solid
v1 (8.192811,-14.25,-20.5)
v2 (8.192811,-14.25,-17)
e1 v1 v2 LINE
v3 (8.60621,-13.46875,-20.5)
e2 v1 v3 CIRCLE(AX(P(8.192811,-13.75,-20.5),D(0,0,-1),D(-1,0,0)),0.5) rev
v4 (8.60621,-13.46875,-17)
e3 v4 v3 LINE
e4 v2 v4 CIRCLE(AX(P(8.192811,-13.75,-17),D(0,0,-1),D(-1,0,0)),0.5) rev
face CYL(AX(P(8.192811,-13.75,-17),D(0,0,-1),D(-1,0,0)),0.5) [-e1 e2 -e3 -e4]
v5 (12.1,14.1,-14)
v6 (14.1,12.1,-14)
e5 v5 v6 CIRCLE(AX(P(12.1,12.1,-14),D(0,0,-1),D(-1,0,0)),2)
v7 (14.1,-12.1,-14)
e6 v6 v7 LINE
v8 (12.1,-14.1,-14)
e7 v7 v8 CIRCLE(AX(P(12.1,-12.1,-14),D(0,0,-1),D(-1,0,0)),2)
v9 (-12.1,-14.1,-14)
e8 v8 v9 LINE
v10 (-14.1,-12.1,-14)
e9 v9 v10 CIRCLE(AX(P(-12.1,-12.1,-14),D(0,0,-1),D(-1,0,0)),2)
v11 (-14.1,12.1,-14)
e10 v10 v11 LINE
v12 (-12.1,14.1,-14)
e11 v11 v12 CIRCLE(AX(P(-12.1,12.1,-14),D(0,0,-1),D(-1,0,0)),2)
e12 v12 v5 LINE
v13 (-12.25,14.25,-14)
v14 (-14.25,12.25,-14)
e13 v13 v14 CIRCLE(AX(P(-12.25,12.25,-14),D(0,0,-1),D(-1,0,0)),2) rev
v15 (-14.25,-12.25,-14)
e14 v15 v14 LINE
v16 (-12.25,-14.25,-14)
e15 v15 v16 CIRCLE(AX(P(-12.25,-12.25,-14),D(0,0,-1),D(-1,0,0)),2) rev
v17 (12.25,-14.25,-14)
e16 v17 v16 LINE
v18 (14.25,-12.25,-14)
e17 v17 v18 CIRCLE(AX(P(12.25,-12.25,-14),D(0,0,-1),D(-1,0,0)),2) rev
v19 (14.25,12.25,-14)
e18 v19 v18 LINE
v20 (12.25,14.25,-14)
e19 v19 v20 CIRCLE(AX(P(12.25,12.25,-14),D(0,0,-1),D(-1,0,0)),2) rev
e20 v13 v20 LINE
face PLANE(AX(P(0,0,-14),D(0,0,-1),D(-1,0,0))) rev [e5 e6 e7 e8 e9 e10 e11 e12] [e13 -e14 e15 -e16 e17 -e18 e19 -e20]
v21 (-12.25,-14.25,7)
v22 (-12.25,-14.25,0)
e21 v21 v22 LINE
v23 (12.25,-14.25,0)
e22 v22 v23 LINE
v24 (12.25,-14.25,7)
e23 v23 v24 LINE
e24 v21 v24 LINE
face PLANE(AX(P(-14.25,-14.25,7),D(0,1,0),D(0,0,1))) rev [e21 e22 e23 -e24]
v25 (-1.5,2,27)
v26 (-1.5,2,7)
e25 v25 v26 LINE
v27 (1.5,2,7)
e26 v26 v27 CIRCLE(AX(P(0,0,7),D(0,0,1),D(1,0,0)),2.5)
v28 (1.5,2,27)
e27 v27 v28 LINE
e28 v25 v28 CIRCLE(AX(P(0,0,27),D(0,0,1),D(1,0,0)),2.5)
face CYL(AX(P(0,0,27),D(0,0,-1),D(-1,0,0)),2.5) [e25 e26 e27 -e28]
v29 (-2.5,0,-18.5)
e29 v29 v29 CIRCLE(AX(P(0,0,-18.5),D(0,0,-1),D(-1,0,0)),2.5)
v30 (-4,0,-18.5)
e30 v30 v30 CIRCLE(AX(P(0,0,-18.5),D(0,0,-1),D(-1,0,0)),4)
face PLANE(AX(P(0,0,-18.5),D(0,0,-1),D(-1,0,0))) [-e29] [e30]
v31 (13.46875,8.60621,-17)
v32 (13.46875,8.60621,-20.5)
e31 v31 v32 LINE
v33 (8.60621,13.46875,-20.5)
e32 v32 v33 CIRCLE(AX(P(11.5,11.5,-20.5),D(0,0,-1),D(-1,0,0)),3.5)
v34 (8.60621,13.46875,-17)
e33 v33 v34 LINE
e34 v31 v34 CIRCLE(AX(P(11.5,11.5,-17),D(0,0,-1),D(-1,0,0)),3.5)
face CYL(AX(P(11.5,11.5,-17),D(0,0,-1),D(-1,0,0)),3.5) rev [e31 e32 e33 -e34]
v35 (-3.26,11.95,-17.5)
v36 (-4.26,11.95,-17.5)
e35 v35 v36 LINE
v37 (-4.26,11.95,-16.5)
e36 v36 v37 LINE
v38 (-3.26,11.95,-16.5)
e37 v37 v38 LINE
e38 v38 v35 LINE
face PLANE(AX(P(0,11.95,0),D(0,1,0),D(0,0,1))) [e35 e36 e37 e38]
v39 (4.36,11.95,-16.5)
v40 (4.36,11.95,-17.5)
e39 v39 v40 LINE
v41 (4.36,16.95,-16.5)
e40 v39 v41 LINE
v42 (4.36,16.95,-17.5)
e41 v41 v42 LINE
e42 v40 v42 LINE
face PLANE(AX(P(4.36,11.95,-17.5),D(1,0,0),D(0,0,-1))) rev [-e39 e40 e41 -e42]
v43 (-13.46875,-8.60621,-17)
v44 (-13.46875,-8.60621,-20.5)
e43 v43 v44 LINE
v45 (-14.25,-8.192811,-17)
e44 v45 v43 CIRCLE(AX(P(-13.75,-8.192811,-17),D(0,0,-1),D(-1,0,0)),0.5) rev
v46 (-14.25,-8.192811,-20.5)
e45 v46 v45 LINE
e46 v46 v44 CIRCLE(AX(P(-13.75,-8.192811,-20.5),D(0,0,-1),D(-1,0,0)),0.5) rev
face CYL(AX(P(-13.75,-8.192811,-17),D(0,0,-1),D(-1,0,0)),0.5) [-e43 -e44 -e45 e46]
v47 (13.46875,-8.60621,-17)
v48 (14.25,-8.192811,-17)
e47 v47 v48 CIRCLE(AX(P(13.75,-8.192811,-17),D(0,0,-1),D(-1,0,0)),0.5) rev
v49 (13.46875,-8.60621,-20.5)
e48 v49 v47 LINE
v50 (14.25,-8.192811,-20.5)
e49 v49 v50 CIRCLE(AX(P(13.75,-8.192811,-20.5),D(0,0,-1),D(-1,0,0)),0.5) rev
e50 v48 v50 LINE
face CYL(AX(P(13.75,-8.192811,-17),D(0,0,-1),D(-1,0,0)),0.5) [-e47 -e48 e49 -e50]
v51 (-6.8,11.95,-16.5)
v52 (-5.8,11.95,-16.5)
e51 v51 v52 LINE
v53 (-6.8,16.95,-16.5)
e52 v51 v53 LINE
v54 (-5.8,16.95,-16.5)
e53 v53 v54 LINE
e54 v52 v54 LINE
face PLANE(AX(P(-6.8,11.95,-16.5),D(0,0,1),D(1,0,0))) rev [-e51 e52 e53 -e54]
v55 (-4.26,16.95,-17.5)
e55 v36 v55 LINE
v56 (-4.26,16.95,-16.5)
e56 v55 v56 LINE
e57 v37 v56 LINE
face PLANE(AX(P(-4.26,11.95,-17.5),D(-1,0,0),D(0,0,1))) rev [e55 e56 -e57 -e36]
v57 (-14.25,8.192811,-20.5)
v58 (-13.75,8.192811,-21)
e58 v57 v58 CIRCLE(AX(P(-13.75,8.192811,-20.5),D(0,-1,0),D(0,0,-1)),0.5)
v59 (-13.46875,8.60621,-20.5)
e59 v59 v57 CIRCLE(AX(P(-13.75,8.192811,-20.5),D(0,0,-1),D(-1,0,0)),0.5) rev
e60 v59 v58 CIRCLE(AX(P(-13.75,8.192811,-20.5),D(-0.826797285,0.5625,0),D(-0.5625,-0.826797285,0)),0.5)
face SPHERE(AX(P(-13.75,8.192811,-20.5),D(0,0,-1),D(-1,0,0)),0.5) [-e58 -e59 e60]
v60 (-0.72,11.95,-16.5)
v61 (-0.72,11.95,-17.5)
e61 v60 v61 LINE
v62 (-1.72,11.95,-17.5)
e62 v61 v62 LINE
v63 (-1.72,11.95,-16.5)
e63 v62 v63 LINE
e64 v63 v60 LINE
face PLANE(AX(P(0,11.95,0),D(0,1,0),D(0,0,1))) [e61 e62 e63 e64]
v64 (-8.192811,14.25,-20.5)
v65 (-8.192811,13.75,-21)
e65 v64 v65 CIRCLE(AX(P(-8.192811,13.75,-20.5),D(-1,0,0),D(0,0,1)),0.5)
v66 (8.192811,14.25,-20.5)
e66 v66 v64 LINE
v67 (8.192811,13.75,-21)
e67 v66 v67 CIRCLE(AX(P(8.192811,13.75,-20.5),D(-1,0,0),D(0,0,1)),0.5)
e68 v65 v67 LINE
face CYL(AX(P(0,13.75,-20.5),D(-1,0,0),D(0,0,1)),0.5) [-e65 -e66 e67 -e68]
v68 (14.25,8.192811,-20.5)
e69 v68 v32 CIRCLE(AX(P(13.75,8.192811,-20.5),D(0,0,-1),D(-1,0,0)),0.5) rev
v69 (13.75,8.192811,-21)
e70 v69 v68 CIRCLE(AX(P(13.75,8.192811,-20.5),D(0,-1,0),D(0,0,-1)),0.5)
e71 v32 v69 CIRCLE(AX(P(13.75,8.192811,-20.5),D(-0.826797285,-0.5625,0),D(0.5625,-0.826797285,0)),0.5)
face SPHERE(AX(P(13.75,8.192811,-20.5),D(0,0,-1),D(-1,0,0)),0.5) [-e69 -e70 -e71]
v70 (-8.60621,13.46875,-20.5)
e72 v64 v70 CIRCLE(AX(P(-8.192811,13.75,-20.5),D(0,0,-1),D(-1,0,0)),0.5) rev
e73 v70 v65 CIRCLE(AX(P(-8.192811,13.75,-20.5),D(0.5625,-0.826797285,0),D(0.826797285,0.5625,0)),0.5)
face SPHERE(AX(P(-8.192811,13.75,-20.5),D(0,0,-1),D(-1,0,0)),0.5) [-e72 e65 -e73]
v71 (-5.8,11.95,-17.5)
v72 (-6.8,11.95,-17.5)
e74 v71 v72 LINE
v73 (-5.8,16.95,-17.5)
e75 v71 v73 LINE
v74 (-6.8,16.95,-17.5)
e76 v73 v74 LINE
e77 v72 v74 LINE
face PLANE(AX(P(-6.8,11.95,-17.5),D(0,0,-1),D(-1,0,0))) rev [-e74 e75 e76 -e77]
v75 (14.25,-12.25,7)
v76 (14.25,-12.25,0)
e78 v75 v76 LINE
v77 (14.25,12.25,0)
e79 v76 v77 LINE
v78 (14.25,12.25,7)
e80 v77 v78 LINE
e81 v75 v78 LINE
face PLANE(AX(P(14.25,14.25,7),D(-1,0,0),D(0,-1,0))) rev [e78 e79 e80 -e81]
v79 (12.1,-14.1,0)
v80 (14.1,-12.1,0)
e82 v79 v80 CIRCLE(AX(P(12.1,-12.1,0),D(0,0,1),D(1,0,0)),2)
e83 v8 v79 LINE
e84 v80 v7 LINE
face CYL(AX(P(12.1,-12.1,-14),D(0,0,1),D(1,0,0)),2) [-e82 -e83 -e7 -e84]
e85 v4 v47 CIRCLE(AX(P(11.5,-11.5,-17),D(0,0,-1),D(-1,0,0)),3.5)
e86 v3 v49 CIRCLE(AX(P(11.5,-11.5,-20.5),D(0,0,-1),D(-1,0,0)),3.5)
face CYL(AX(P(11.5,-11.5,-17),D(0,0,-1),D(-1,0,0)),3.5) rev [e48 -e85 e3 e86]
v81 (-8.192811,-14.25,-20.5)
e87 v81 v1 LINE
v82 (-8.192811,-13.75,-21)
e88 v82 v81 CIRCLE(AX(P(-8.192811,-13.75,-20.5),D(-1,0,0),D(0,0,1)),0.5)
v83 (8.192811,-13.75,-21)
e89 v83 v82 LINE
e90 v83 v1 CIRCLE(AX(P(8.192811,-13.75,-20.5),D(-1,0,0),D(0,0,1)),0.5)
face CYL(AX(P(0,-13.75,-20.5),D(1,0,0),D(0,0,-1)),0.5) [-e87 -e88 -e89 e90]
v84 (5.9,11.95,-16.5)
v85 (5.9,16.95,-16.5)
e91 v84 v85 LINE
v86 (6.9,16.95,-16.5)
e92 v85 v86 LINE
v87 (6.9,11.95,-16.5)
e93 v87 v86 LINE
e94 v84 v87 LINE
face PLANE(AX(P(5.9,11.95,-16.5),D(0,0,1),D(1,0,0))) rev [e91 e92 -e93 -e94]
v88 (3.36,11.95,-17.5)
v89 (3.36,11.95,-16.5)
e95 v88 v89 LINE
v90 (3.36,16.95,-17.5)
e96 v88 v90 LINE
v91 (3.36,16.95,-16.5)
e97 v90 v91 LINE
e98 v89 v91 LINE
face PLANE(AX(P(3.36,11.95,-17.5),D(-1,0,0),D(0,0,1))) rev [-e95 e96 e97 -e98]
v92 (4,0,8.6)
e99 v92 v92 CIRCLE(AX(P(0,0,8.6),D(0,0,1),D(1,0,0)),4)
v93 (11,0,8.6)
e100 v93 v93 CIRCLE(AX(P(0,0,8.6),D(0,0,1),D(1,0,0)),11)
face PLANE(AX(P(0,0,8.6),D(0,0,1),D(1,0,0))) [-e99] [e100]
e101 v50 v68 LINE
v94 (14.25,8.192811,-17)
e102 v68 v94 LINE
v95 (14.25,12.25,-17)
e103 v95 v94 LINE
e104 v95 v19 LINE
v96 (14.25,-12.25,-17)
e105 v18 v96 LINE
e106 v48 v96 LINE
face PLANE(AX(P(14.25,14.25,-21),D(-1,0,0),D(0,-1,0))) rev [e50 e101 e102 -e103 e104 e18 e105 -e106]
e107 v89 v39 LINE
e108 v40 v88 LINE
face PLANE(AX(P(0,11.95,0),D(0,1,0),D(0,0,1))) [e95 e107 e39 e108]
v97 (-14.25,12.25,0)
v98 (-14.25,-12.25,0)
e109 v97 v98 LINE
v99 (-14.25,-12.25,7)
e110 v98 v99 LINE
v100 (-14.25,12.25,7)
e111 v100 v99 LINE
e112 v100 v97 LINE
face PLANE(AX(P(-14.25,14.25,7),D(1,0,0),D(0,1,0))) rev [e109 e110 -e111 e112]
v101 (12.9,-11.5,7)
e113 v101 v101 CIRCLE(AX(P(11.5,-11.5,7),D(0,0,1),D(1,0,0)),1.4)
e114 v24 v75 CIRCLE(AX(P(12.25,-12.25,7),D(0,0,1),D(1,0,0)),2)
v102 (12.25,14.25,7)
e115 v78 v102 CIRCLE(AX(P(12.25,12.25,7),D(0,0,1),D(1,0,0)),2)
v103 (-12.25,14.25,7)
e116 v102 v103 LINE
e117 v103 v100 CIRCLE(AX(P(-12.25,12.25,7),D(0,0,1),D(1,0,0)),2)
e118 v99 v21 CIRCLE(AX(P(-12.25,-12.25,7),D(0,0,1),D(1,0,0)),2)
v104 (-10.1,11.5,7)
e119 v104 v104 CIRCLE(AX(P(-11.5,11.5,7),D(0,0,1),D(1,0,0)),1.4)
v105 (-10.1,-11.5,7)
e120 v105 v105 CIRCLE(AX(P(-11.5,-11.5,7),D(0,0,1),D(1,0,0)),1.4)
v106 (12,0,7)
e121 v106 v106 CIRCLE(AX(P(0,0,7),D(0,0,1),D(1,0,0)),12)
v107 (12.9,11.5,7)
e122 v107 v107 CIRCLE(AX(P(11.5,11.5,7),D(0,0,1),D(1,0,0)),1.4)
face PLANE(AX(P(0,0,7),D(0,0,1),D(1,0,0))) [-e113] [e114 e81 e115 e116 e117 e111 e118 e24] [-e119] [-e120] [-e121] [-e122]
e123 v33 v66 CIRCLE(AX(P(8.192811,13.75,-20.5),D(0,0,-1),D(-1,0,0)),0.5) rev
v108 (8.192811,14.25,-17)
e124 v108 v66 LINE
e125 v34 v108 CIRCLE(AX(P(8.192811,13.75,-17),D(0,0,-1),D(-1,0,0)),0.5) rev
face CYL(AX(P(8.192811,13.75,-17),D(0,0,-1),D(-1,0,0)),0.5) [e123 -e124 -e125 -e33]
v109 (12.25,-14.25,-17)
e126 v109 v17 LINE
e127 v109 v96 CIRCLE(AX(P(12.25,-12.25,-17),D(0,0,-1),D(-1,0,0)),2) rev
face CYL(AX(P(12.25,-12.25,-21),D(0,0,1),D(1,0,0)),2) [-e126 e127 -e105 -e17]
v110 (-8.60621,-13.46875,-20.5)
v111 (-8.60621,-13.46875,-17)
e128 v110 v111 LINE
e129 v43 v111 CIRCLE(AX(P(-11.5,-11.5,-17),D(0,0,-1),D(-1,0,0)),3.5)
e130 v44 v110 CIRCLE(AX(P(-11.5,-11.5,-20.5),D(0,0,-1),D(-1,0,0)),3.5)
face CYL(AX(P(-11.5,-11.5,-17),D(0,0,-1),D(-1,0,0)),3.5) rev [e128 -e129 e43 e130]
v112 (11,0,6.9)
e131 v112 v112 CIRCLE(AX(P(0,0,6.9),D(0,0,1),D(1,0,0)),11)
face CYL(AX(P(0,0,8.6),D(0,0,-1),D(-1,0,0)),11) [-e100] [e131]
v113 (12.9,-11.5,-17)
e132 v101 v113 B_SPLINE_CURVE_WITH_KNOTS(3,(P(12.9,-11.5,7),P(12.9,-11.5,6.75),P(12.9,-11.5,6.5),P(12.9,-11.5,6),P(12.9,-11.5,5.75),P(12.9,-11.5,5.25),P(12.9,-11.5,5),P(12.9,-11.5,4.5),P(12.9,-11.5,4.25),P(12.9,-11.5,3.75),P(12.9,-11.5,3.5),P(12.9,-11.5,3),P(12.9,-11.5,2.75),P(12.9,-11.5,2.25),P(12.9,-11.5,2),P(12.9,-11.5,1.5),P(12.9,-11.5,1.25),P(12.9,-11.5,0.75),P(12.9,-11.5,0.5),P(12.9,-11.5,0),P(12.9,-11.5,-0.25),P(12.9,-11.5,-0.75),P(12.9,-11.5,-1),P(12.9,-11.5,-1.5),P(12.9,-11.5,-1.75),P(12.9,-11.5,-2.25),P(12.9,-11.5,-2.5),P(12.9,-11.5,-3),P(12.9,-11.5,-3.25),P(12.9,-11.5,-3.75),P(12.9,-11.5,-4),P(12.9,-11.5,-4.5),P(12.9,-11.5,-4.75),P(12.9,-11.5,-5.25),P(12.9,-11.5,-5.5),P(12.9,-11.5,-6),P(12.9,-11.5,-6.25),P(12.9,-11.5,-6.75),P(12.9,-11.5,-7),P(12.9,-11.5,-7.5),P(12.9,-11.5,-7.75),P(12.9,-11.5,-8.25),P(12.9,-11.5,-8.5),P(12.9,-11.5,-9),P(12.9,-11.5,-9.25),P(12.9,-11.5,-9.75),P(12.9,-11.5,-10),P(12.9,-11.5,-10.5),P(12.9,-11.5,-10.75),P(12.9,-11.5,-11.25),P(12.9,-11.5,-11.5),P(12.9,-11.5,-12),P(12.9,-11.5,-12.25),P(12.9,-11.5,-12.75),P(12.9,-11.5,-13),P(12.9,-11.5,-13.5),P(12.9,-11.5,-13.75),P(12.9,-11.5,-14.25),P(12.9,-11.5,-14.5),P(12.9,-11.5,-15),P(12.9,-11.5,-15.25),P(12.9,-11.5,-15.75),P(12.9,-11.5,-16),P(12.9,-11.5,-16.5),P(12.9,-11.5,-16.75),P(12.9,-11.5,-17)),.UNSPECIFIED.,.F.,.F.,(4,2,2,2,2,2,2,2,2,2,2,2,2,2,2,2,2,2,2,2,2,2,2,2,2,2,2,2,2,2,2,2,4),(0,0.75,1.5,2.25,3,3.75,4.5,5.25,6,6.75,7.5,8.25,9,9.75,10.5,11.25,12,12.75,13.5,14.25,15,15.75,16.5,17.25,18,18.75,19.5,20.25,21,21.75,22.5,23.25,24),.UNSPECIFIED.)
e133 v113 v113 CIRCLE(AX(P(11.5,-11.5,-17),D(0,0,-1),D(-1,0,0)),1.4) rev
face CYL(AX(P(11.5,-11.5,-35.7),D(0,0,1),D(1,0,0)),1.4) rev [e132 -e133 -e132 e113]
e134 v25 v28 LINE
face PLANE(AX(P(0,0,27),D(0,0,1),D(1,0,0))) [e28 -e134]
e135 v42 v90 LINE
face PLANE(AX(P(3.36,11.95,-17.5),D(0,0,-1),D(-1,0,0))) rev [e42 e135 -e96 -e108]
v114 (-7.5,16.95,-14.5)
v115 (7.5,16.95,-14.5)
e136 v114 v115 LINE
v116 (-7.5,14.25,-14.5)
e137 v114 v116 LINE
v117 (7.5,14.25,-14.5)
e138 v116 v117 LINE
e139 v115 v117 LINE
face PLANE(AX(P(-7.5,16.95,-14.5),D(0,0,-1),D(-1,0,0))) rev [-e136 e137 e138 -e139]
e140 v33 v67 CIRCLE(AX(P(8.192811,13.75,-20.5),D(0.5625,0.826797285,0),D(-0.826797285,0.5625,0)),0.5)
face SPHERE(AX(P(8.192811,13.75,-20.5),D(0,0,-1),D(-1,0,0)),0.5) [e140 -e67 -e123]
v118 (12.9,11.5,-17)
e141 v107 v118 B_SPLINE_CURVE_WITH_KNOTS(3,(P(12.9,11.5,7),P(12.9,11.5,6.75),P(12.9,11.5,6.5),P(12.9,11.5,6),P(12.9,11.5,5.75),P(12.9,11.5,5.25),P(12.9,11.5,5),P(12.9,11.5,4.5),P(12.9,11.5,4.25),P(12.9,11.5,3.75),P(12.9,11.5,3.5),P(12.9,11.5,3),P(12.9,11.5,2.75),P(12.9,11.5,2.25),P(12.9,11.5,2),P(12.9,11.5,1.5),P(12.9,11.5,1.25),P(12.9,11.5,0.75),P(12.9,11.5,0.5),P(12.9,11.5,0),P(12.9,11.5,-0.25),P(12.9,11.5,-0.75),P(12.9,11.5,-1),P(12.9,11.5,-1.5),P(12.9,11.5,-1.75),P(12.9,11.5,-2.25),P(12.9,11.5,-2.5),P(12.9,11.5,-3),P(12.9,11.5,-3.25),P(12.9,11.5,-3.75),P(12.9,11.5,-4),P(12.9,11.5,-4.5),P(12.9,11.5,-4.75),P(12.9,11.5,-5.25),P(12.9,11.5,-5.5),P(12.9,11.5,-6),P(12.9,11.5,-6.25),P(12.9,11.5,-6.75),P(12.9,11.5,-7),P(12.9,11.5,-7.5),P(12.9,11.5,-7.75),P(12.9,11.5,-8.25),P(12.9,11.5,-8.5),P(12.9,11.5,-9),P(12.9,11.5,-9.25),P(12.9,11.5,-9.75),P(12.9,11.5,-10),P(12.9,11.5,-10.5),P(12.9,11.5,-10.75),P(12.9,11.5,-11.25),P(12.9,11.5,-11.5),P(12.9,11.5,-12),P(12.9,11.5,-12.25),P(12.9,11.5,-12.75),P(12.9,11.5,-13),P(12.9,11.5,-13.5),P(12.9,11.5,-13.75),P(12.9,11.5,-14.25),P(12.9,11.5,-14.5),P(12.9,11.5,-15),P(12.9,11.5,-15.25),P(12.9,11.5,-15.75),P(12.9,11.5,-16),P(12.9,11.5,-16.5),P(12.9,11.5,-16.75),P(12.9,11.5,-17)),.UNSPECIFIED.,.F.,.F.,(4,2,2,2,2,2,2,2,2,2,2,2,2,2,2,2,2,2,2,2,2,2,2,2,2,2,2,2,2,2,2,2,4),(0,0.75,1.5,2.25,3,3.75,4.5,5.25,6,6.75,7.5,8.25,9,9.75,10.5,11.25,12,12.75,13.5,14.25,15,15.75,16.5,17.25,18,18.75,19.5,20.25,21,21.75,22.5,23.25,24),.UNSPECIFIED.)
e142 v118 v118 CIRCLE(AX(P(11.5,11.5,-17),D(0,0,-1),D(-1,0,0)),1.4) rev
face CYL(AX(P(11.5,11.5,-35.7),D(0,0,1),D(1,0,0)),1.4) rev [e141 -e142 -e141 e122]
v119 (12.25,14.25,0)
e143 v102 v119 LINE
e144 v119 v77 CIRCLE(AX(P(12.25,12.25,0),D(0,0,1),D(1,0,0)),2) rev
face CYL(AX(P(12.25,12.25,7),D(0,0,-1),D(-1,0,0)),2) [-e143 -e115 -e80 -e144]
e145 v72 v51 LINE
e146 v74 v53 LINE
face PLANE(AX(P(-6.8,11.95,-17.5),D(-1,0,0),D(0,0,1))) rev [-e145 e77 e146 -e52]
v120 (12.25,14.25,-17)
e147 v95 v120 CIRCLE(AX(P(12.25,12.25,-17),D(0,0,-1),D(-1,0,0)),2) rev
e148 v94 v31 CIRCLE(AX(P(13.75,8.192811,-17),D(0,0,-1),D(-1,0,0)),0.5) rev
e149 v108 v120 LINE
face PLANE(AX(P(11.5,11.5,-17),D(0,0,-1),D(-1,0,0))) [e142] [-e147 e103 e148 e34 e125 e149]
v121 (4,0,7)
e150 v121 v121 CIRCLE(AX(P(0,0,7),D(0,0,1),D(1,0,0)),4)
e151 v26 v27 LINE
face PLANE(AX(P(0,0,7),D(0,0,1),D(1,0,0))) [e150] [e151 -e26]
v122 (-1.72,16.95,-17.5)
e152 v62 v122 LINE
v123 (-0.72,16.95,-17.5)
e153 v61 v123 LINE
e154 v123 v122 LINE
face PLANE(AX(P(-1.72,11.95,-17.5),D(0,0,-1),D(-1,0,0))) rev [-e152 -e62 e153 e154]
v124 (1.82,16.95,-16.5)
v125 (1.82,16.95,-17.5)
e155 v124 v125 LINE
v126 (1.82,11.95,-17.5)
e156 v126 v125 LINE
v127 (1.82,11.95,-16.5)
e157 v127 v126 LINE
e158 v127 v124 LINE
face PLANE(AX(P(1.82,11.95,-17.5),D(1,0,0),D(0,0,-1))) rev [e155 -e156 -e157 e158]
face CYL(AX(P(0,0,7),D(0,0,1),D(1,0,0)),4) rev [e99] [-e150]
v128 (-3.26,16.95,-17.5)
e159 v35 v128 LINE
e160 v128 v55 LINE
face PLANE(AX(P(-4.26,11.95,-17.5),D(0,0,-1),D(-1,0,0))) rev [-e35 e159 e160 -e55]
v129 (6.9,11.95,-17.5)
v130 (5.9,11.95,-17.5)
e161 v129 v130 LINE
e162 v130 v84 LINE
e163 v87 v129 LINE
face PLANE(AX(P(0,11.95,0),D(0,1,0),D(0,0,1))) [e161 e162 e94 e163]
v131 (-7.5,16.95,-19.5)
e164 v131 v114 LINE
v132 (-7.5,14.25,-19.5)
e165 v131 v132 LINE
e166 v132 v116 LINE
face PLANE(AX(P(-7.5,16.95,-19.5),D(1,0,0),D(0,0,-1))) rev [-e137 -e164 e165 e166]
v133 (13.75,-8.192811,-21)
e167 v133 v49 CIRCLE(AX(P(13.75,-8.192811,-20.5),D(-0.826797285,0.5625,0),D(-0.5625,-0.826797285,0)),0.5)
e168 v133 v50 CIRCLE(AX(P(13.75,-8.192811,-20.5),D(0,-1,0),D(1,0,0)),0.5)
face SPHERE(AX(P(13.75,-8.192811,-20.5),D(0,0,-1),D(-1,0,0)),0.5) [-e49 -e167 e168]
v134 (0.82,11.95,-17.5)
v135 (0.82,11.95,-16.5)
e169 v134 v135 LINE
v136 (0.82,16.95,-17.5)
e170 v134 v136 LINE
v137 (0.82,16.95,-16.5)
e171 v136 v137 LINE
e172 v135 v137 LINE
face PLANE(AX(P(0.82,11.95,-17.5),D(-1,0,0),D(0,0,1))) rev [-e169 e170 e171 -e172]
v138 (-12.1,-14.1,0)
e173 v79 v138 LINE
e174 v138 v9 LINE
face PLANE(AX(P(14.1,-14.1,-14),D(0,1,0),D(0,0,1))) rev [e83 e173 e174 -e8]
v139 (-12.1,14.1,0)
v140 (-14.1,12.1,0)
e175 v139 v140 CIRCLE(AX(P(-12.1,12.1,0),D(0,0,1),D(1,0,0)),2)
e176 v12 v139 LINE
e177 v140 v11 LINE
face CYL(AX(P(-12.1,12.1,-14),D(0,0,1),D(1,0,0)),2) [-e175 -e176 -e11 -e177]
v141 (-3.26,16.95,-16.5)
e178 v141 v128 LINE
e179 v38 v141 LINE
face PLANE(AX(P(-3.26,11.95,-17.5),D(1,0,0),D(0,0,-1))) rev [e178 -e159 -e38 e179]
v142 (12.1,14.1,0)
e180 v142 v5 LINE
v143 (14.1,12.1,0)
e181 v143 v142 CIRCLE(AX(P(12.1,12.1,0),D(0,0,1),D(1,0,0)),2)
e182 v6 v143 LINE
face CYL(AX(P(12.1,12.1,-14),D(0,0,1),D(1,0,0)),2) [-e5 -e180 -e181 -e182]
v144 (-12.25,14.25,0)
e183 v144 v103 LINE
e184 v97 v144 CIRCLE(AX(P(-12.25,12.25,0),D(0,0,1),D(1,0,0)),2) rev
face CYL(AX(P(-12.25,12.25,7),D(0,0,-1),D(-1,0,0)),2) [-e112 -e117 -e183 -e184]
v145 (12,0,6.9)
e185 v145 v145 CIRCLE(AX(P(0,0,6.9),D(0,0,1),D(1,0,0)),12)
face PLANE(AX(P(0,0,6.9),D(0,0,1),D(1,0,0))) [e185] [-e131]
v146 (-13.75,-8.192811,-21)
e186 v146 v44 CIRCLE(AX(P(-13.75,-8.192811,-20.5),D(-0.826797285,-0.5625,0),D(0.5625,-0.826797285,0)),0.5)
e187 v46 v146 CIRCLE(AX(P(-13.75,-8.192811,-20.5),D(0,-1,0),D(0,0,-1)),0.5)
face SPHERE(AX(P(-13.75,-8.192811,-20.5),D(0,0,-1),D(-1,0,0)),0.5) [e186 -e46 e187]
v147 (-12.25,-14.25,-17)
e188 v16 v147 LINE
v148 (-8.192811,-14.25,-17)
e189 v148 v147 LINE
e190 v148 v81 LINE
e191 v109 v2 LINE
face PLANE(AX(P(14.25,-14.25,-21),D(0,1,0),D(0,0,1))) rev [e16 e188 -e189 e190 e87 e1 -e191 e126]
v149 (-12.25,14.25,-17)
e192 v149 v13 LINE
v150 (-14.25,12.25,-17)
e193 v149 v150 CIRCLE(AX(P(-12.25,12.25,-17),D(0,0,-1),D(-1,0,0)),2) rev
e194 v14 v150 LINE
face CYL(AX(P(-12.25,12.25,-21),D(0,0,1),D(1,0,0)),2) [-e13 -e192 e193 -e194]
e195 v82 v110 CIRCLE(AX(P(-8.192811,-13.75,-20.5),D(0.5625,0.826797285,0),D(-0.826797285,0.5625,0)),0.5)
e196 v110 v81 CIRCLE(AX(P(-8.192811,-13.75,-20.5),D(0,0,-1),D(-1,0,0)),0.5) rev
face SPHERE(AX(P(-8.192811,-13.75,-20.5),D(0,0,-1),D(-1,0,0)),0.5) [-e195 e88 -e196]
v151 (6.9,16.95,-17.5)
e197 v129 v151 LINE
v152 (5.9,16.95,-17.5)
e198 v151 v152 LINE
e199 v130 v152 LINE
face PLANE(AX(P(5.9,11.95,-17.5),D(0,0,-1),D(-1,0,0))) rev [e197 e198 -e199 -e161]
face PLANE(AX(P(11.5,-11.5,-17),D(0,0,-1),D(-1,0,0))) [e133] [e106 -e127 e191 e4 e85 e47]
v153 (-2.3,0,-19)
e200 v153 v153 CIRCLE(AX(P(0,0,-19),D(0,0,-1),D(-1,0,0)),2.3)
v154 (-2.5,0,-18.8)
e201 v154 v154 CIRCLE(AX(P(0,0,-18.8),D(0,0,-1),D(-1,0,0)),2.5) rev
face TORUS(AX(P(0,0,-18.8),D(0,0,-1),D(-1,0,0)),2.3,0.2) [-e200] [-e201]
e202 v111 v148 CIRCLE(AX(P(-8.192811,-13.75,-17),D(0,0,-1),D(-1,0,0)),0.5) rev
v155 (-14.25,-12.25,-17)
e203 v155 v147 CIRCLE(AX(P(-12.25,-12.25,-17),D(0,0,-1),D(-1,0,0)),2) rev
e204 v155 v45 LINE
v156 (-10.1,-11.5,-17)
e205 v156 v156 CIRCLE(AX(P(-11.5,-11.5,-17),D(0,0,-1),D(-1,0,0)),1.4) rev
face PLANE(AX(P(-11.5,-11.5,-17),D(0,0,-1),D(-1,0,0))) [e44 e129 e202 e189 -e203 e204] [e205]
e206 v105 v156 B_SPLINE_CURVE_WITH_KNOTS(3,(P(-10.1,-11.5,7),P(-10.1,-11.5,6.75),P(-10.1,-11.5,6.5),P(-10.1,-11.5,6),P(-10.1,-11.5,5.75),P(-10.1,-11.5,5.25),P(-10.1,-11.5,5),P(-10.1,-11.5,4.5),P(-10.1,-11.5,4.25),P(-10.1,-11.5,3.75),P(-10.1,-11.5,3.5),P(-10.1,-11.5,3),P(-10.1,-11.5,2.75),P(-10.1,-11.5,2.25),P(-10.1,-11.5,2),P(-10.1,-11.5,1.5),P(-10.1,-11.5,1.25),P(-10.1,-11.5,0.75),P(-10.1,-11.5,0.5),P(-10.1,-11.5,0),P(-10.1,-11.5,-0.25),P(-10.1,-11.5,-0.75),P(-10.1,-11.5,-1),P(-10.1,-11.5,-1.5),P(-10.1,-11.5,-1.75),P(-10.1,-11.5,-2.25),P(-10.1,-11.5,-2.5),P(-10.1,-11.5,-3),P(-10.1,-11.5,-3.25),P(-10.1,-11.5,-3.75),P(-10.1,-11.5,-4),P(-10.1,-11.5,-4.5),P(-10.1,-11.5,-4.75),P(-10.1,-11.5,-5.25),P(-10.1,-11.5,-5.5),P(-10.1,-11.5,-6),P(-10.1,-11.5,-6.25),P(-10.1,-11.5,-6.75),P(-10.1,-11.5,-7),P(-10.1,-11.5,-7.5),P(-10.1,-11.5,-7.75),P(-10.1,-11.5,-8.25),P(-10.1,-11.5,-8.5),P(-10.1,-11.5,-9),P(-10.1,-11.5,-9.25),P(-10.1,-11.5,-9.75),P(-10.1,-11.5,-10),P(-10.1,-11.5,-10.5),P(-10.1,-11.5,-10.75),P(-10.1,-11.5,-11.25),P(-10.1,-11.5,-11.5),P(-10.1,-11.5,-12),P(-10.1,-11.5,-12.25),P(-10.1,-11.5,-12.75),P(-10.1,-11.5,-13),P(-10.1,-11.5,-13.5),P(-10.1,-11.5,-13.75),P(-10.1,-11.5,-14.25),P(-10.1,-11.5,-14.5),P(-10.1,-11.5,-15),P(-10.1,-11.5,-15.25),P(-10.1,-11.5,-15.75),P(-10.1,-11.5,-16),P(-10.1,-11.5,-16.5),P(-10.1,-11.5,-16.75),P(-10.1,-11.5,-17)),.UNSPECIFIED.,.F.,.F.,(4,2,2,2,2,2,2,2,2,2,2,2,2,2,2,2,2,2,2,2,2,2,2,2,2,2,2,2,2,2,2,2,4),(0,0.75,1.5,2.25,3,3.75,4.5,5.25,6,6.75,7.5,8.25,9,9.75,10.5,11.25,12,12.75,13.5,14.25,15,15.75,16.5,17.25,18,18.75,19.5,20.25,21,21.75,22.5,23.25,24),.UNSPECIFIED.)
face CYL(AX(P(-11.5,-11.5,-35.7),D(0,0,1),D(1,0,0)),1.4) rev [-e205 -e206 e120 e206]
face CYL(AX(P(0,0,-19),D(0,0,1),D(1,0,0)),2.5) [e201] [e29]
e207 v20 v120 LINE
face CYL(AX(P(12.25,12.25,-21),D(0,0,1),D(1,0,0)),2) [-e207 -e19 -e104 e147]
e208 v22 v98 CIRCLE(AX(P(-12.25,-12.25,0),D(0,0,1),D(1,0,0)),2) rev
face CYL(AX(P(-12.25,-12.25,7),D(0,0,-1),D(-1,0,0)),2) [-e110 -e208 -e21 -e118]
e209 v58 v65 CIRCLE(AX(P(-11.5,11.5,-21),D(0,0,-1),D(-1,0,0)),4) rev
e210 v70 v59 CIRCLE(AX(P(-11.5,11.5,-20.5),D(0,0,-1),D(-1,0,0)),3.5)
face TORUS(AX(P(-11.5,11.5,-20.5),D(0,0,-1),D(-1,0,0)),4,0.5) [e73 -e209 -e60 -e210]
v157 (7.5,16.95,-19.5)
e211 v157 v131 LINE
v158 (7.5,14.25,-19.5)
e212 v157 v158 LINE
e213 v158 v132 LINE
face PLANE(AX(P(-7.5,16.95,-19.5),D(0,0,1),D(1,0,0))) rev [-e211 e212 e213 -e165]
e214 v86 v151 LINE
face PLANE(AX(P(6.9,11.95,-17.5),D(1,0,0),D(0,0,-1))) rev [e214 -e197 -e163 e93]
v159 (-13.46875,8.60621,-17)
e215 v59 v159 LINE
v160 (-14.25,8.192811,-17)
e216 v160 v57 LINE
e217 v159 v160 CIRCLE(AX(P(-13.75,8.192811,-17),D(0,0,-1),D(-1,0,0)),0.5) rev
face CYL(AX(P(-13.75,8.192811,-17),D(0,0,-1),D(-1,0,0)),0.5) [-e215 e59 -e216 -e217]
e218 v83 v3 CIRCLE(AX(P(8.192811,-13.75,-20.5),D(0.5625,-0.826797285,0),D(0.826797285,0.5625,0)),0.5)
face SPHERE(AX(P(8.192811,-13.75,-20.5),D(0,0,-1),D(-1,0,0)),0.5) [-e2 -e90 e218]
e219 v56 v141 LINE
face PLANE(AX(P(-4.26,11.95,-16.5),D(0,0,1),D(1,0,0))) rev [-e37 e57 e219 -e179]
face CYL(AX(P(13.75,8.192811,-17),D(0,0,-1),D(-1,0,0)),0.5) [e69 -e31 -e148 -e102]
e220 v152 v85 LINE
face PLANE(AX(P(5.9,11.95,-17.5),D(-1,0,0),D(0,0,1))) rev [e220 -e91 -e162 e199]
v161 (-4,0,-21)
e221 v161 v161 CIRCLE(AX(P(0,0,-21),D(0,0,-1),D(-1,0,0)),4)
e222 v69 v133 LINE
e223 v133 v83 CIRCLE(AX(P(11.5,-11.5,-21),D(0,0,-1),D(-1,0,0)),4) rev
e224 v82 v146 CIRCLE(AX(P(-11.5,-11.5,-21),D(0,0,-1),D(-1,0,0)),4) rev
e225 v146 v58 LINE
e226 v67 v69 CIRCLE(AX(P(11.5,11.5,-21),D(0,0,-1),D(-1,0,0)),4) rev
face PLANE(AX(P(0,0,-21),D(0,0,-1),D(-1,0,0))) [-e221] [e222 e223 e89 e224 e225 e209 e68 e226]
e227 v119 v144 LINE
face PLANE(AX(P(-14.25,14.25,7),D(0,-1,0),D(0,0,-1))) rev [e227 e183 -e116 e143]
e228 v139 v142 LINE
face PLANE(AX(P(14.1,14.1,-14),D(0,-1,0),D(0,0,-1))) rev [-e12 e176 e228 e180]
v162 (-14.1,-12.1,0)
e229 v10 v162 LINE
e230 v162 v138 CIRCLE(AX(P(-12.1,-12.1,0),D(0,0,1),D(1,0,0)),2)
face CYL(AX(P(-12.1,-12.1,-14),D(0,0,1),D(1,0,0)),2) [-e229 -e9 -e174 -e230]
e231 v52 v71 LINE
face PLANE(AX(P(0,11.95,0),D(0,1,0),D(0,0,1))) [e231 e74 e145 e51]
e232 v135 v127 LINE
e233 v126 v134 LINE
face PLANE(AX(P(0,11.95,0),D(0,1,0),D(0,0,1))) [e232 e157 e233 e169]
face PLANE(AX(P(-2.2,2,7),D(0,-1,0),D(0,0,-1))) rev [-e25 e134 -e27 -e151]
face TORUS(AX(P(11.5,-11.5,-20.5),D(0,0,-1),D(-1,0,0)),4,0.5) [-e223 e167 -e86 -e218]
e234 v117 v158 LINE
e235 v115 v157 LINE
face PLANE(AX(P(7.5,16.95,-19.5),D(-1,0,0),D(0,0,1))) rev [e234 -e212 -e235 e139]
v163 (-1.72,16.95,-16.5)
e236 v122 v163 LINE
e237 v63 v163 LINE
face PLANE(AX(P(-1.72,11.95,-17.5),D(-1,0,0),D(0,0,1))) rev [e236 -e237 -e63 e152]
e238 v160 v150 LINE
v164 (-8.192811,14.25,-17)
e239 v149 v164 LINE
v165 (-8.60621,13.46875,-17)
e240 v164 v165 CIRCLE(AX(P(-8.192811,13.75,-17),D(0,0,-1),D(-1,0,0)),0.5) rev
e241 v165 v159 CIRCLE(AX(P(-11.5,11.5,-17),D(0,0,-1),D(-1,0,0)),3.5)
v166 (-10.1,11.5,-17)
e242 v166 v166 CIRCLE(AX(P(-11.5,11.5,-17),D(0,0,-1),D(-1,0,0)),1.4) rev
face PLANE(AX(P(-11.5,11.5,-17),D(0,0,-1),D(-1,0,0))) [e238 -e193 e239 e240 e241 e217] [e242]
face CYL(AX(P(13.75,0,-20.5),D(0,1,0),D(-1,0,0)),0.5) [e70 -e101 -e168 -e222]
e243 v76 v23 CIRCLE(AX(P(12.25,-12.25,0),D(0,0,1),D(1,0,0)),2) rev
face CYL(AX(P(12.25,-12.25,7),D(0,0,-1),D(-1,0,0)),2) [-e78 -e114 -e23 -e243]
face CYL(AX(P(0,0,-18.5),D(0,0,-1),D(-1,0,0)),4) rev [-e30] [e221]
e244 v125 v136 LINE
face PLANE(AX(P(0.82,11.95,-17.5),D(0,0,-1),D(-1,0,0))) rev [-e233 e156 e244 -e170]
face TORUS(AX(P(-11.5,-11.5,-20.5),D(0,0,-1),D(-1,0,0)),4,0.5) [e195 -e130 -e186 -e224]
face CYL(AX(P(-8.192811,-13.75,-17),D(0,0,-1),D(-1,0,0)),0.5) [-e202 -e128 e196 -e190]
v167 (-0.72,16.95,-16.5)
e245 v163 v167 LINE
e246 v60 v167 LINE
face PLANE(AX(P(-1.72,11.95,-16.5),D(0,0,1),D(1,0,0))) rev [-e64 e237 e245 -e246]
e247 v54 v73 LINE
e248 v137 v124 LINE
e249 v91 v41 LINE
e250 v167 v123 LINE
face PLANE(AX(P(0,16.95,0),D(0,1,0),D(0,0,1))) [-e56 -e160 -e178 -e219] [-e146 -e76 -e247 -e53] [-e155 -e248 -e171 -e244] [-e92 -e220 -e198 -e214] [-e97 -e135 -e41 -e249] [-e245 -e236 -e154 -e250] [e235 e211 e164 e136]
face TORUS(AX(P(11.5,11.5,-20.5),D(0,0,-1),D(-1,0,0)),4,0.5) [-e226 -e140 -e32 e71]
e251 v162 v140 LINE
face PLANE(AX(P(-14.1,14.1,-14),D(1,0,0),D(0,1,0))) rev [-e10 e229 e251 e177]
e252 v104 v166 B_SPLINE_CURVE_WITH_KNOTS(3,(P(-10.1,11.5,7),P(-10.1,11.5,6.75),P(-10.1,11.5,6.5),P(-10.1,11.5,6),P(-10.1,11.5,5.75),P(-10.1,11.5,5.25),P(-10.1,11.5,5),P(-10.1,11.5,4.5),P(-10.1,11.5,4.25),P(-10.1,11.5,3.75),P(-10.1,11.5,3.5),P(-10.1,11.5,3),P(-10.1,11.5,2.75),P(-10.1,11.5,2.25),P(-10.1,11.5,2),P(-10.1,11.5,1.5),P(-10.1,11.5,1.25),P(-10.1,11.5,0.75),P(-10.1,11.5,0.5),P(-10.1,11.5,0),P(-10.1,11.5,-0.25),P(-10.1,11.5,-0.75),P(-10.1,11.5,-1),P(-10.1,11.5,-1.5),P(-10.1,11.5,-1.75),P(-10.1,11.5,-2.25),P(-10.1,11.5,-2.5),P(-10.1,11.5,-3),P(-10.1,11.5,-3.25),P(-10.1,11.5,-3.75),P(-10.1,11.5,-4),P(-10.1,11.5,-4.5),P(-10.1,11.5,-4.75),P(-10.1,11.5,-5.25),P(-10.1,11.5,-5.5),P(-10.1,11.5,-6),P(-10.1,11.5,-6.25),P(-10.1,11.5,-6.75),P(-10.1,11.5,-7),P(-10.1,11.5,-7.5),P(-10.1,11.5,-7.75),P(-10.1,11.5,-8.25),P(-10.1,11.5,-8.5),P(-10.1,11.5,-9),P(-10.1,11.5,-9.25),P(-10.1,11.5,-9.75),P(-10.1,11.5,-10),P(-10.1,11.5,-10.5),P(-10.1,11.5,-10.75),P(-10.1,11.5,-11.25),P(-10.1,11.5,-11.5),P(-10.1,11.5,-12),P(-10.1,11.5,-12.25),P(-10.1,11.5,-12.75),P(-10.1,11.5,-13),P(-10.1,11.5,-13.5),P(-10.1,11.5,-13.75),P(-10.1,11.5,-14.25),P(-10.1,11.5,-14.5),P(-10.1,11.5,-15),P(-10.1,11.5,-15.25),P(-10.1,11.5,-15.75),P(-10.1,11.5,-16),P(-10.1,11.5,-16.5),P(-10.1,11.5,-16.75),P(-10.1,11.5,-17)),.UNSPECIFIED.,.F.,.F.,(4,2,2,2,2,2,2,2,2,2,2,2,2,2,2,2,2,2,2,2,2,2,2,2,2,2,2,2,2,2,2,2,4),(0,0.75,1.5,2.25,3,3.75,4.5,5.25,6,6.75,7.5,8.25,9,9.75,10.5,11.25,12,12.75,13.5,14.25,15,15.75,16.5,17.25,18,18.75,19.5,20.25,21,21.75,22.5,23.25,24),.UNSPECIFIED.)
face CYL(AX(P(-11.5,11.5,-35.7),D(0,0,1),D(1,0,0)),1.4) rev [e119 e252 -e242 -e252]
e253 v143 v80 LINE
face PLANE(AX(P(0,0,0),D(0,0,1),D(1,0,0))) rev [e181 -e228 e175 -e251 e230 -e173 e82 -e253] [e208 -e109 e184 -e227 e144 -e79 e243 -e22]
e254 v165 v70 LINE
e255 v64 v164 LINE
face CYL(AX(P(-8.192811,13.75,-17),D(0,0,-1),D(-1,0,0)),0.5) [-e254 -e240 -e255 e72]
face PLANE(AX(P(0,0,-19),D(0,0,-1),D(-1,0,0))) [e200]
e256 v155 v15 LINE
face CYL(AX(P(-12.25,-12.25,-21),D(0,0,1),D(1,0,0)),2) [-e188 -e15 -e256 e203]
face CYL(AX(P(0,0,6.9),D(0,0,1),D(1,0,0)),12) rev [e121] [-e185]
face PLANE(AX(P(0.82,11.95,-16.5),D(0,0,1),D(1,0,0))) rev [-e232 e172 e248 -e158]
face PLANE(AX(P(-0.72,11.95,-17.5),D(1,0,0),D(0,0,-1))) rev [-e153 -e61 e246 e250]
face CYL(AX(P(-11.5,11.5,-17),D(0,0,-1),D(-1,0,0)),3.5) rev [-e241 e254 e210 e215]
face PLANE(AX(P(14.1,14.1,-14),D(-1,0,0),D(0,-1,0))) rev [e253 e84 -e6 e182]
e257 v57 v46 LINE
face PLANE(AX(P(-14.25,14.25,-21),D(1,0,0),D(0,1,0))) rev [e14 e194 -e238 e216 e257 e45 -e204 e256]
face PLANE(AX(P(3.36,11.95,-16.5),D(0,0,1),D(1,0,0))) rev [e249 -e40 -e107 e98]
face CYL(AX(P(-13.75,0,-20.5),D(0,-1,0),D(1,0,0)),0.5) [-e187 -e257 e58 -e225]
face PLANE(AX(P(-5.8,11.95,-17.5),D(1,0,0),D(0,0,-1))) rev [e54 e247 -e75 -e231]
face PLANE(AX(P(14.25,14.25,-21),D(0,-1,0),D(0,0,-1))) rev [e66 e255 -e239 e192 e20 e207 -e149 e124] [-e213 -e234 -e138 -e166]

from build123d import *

# Parameters (mm, degrees)
SKETCH1_W           = 28.5
SKETCH1_H           = 28.5
BOSS_EXTRUDE1_DEPTH = 7
FILLET1_R           = 2
SKETCH2_R           = 11
BOSS_EXTRUDE2_DEPTH = 1.6
SKETCH3_R           = 4
CUT_EXTRUDE1_DEPTH  = 1.6
SKETCH4_R           = 2.5
BOSS_EXTRUDE3_DEPTH = 20
SKETCH5_W           = 4.4
SKETCH5_H           = 1
CUT_EXTRUDE2_DEPTH  = 20
SKETCH6_W           = 28.2
SKETCH6_H           = 28.2
BOSS_EXTRUDE4_DEPTH = 14
FILLET2_R           = 2
SKETCH7_W           = 28.5
SKETCH7_H           = 28.5
BOSS_EXTRUDE5_DEPTH = 7
FILLET3_R           = 2
SKETCH8_W           = 15
SKETCH8_H           = 5
BOSS_EXTRUDE6_DEPTH = 2.7
SKETCH9_R           = 1.4
CUT_EXTRUDE3_DEPTH  = 42.7
SKETCH10_R          = 3.5
CUT_EXTRUDE4_DEPTH  = 4
FILLET4_R           = 0.5
FILLET5_R           = 0.5
CUT_EXTRUDE5_START  = -0.1
SKETCH11_R          = 12
SKETCH11_R_2        = 11
CUT_EXTRUDE5_DEPTH  = 0.1
CUT_EXTRUDE6_START  = -2.5
SKETCH12_R          = 4
CUT_EXTRUDE6_DEPTH  = 2.5
BOSS_EXTRUDE7_START = 0.5
SKETCH13_R          = 2.5
BOSS_EXTRUDE7_DEPTH = 0.5
FILLET6_R           = 0.2
SKETCH14_W          = 1
SKETCH14_H          = 1
CUT_EXTRUDE7_DEPTH  = 5


with BuildPart() as part:
    # Sketch1 → Boss-Extrude1 (new body)
    with BuildSketch(Plane.XY):
        Rectangle(SKETCH1_W, SKETCH1_H)
    extrude(amount=BOSS_EXTRUDE1_DEPTH)

    # Fillet1
    fillet1_edges = [part.edges().sort_by_distance(p)[0] for p in [
        (14.25, -14.25, 3.5),
        (-14.25, -14.25, 3.5),
        (-14.25, 14.25, 3.5),
        (14.25, 14.25, 3.5),
    ]]
    fillet(fillet1_edges, radius=FILLET1_R)

    # Sketch2 → Boss-Extrude2 (add)
    with BuildSketch(Plane.XY.offset(7)):
        Circle(SKETCH2_R)
    extrude(amount=BOSS_EXTRUDE2_DEPTH)

    # Sketch3 → Cut-Extrude1 (cut)
    with BuildSketch(Plane.XY.offset(8.6)):
        Circle(SKETCH3_R)
    extrude(amount=-CUT_EXTRUDE1_DEPTH, mode=Mode.SUBTRACT)

    # Sketch4 → Boss-Extrude3 (add)
    with BuildSketch(Plane.XY.offset(7)):
        Circle(SKETCH4_R)
    extrude(amount=BOSS_EXTRUDE3_DEPTH)

    # Sketch5 → Cut-Extrude2 (cut)
    with BuildSketch(Plane.XY.offset(27)):
        with Locations((0, 2.5)):
            Rectangle(SKETCH5_W, SKETCH5_H)
    extrude(amount=-CUT_EXTRUDE2_DEPTH, mode=Mode.SUBTRACT)

    # Sketch6 → Boss-Extrude4 (add)
    with BuildSketch(Plane(origin=(0, 0, 0), x_dir=(-1, 0, 0), z_dir=(0, 0, -1))):
        Rectangle(SKETCH6_W, SKETCH6_H)
    extrude(amount=BOSS_EXTRUDE4_DEPTH)

    # Fillet2
    # the kernel refuses this fillet: 2 mm, written as the material it takes off along each edge
    with BuildSketch(Plane(origin=(-14.1, -14.1, 0), x_dir=(0, 1, 0), z_dir=(0, 0, -1)), Plane(origin=(-14.1, 14.1, 0), x_dir=(1, 0, 0), z_dir=(0, 0, -1))) as fillet2_piece_1:
        with BuildLine():
            CenterArc((FILLET2_R, FILLET2_R), FILLET2_R, 180, 90)
            Line((0, FILLET2_R), (0, 0))
            Line((0, 0), (FILLET2_R, 0))
        make_face()
    extrude(amount=19, mode=Mode.SUBTRACT)
    with BuildSketch(Plane(origin=(14.1, 14.1, 0), x_dir=(-1, 0, 0), z_dir=(0, 0, -1)), Plane(origin=(14.1, -14.1, 0), x_dir=(0, 1, 0), z_dir=(0, 0, -1))) as fillet2_piece_2:
        with BuildLine():
            CenterArc((FILLET2_R, -FILLET2_R), FILLET2_R, 90, 90)
            Line((0, -FILLET2_R), (0, 0))
            Line((0, 0), (FILLET2_R, 0))
        make_face()
    extrude(amount=19, mode=Mode.SUBTRACT)

    # Sketch7 → Boss-Extrude5 (add)
    with BuildSketch(Plane(origin=(0, 0, -14), x_dir=(-1, 0, 0), z_dir=(0, 0, -1))):
        Rectangle(SKETCH7_W, SKETCH7_H)
    extrude(amount=BOSS_EXTRUDE5_DEPTH)

    # Fillet3
    fillet3_edges = [part.edges().sort_by_distance(p)[0] for p in [
        (-14.25, -14.25, -17.5),
        (-14.25, 14.25, -17.5),
        (14.25, 14.25, -17.5),
        (14.25, -14.25, -17.5),
    ]]
    fillet(fillet3_edges, radius=FILLET3_R)

    # Sketch8 → Boss-Extrude6 (add)
    with BuildSketch(Plane(origin=(0, 14.25, 0), x_dir=(1, 0, 0), z_dir=(0, 1, 0))):
        with Locations((0, 17)):
            Rectangle(SKETCH8_W, SKETCH8_H)
    extrude(amount=BOSS_EXTRUDE6_DEPTH)

    # Sketch9 → Cut-Extrude3 (cut)
    with BuildSketch(Plane.XY.offset(7)):
        with Locations((-11.5, 11.5)):
            Circle(SKETCH9_R)
        with Locations((11.5, 11.5)):
            Circle(SKETCH9_R)
        with Locations((11.5, -11.5)):
            Circle(SKETCH9_R)
        with Locations((-11.5, -11.5)):
            Circle(SKETCH9_R)
    extrude(amount=-CUT_EXTRUDE3_DEPTH, mode=Mode.SUBTRACT)

    # Sketch10 → Cut-Extrude4 (cut)
    with BuildSketch(Plane(origin=(0, 0, -21), x_dir=(-1, 0, 0), z_dir=(0, 0, -1))):
        with Locations((-11.5, 11.5)):
            Circle(SKETCH10_R)
        with Locations((11.5, 11.5)):
            Circle(SKETCH10_R)
        with Locations((11.5, -11.5)):
            Circle(SKETCH10_R)
        with Locations((-11.5, -11.5)):
            Circle(SKETCH10_R)
    extrude(amount=-CUT_EXTRUDE4_DEPTH, mode=Mode.SUBTRACT)

    # Fillet4
    fillet4_edges = [part.edges().sort_by_distance(p)[0] for p in [
        (14.25, -9.334936491, -19),
        (9.334936491, -14.25, -19),
        (-14.25, -9.334936491, -19),
        (-9.334936491, -14.25, -19),
        (-9.334936491, 14.25, -19),
        (-14.25, 9.334936491, -19),
        (9.334936491, 14.25, -19),
        (14.25, 9.334936491, -19),
    ]]
    fillet(fillet4_edges, radius=FILLET4_R)

    # Fillet5
    fillet5_edges = [part.edges().sort_by_distance(p)[0] for p in [
        (-14.25, 0, -21),
        (9.025126266, -9.025126266, -21),
        (0, -14.25, -21),
        (-9.025126266, -9.025126266, -21),
        (-9.025126266, 9.025126266, -21),
        (0, 14.25, -21),
        (9.025126266, 9.025126266, -21),
        (14.25, 0, -21),
        (13.983853587, 8.634752599, -21),
        (8.634752599, 13.983853587, -21),
        (13.983853587, -8.634752599, -21),
        (8.634752599, -13.983853587, -21),
        (-8.634752599, -13.983853587, -21),
        (-13.983853587, -8.634752599, -21),
        (-8.634752599, 13.983853587, -21),
        (-13.983853587, 8.634752599, -21),
    ]]
    fillet(fillet5_edges, radius=FILLET5_R)

    # Sketch11 → Cut-Extrude5 (cut)
    with BuildSketch(Plane.XY.offset(7).offset(CUT_EXTRUDE5_START)):
        Circle(SKETCH11_R)
        Circle(SKETCH11_R_2, mode=Mode.SUBTRACT)
    extrude(amount=CUT_EXTRUDE5_DEPTH, mode=Mode.SUBTRACT)

    # Sketch12 → Cut-Extrude6 (cut)
    with BuildSketch(Plane(origin=(0, 0, -21), x_dir=(-1, 0, 0), z_dir=(0, 0, -1)).offset(CUT_EXTRUDE6_START)):
        with Locations(Location((0, 0, 0), (0, 0, 180))):
            Circle(SKETCH12_R)
    extrude(amount=CUT_EXTRUDE6_DEPTH, mode=Mode.SUBTRACT)

    # Sketch13 → Boss-Extrude7 (add)
    with BuildSketch(Plane(origin=(0, 0, -18.5), x_dir=(-1, 0, 0), z_dir=(0, 0, -1)).offset(BOSS_EXTRUDE7_START)):
        Circle(SKETCH13_R)
    extrude(amount=-BOSS_EXTRUDE7_DEPTH)

    # Fillet6
    fillet6_edges = [part.edges().sort_by_distance(p)[0] for p in [
        (2.5, 0, -19),
    ]]
    fillet(fillet6_edges, radius=FILLET6_R)

    # Sketch14 → Cut-Extrude7 (cut)
    with BuildSketch(Plane(origin=(0, 16.95, 0), x_dir=(1, 0, 0), z_dir=(0, 1, 0))):
        with Locations((-6.3, 17)):
            Rectangle(SKETCH14_W, SKETCH14_H)
        with Locations((-3.76, 17)):
            Rectangle(SKETCH14_W, SKETCH14_H)
        with Locations((-1.22, 17)):
            Rectangle(SKETCH14_W, SKETCH14_H)
        with Locations((1.32, 17)):
            Rectangle(SKETCH14_W, SKETCH14_H)
        with Locations((3.86, 17)):
            Rectangle(SKETCH14_W, SKETCH14_H)
        with Locations((6.4, 17)):
            Rectangle(SKETCH14_W, SKETCH14_H)
    extrude(amount=-CUT_EXTRUDE7_DEPTH, mode=Mode.SUBTRACT)


solid = part.part
